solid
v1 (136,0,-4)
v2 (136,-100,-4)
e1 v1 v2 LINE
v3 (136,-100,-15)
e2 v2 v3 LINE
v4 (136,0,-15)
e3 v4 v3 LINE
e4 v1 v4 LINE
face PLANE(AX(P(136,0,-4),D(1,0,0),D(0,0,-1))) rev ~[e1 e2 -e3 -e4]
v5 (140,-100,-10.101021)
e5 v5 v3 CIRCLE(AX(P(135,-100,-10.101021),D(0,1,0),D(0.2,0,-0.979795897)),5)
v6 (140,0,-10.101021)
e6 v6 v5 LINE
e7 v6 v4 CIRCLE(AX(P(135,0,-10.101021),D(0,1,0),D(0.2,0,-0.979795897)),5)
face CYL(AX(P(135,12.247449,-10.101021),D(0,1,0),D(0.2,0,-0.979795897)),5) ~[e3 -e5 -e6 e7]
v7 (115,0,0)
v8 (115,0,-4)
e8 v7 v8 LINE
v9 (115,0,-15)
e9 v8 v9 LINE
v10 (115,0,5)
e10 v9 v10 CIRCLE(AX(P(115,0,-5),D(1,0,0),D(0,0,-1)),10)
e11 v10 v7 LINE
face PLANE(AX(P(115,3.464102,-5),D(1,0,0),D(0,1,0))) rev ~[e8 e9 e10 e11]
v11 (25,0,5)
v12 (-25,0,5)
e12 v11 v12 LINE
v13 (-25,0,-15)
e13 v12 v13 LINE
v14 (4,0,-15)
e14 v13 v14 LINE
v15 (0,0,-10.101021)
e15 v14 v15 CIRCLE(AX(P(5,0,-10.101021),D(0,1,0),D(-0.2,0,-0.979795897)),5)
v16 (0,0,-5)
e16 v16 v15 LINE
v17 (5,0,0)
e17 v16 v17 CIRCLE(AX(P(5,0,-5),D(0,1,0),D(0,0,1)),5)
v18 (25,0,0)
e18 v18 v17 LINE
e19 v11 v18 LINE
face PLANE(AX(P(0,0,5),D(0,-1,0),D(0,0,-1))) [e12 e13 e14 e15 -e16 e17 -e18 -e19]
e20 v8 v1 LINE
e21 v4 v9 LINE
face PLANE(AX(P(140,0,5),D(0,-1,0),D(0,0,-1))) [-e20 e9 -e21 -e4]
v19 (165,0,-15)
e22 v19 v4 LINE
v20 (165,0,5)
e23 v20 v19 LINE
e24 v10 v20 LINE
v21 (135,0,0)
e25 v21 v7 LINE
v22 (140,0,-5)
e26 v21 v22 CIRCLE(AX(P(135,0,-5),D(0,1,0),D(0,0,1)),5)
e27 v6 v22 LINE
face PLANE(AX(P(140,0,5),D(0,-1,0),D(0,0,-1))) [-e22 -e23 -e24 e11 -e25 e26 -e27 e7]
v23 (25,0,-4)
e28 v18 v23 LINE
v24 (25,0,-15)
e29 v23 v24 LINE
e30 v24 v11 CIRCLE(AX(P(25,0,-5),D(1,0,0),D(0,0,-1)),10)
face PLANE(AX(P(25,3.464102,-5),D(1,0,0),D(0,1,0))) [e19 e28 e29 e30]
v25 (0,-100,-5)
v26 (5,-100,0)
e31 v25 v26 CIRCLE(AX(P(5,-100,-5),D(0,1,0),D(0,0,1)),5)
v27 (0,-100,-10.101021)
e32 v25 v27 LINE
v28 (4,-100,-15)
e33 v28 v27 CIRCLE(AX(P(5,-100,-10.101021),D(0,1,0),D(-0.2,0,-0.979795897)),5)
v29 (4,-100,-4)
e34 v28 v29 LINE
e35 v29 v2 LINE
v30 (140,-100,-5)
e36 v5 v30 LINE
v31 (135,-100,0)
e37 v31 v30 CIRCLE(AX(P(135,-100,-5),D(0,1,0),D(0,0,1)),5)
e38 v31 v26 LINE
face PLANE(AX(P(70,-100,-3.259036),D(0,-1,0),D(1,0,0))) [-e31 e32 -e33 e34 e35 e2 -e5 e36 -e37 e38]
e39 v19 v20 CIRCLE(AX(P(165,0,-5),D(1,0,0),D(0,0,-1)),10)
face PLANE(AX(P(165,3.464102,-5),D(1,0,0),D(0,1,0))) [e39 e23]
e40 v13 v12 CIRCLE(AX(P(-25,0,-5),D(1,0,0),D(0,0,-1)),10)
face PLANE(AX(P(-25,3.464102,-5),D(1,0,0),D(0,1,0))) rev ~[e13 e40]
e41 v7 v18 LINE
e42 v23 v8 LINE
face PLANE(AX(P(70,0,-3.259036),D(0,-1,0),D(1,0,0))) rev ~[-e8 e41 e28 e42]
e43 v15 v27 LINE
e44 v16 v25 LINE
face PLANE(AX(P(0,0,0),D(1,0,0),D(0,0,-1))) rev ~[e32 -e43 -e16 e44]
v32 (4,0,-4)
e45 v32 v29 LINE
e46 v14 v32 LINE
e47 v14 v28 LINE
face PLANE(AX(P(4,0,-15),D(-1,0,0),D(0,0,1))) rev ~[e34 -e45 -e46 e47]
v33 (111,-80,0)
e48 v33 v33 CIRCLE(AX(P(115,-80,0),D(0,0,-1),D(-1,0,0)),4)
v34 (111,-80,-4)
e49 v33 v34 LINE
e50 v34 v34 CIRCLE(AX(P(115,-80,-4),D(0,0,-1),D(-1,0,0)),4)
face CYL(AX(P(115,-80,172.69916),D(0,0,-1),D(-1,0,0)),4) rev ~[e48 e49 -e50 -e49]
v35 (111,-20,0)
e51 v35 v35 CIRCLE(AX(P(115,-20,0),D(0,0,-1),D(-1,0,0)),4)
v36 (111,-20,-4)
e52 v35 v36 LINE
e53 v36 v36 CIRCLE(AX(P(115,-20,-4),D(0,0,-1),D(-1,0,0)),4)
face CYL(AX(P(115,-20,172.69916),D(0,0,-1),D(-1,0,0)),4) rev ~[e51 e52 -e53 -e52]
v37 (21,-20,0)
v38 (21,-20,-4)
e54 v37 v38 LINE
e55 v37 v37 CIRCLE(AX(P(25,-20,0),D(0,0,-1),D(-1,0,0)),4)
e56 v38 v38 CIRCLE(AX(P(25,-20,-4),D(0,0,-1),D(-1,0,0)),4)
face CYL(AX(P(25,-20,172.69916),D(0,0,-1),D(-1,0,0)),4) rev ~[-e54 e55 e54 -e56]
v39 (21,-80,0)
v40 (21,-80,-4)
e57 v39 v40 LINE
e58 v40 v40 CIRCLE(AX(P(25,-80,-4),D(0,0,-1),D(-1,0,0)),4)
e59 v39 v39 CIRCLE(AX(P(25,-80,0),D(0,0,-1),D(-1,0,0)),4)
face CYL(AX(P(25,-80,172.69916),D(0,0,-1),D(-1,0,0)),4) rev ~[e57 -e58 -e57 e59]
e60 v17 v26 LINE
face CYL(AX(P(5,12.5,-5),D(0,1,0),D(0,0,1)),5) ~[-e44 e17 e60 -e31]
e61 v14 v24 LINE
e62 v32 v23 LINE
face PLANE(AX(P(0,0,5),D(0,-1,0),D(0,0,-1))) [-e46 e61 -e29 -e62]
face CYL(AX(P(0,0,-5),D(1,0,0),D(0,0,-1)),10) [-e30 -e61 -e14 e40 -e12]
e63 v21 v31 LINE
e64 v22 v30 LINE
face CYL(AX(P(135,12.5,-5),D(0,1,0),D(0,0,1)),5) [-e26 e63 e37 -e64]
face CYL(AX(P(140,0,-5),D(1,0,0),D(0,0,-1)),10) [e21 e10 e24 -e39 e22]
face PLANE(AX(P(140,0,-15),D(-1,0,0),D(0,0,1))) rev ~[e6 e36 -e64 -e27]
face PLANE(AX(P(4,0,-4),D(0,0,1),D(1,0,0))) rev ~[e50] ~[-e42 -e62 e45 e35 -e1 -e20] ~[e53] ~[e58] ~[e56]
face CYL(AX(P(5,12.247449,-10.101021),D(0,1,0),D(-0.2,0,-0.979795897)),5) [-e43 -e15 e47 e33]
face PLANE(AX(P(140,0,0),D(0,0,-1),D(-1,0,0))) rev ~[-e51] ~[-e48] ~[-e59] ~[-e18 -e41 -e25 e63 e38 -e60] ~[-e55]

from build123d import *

# Parameters (mm, degrees)
F1_DEPTH    = 100
F2_T1_DEPTH = 125
F2_T3_DEPTH = 124.4948974279
F3_T1_DEPTH = 124.4948974279
F3_T3_DEPTH = 125
F5_D        = 8
F7_R        = 7.5
F10_DEPTH   = 25
F14_DEPTH   = 25


# Not quite as in the source:
# - a fillet or chamfer that OpenCascade refuses, or shapes differently, is made with other operations: its cross-section is extruded or revolved along the edge and cut away or added


with BuildPart() as f1:
    # F0 (on Front) → F1 (new body)
    with BuildSketch(Plane.XZ):
        Polygon((140, 0), (0, 0), (0, -15), (4, -15), (4, -4), (136, -4), (136, -15), (140, -15), align=None)
    extrude(amount=F1_DEPTH)

    # F2: fillet of radius 5 on 2 edges, made by hand

    # F2_s2 → F2_t1 (cut)
    with BuildSketch(Plane.XZ.offset(-12.5)):
        with BuildLine():
            ThreePointArc((5, 0), (1.4644660941, -1.4644660941), (0, -5))
            Line((0, -5), (0, 0))
            Line((0, 0), (5, 0))
        make_face()
    extrude(amount=F2_T1_DEPTH, mode=Mode.SUBTRACT)

    # F2_s4 → F2_t3 (cut)
    with BuildSketch(Plane.XZ.offset(-12.2474487139)):
        with BuildLine():
            ThreePointArc((136, -15), (138.8729833462, -13.2632981746), (140, -10.1010205144))
            Line((140, -10.1010205144), (140, -15))
            Line((140, -15), (136, -15))
        make_face()
    extrude(amount=F2_T3_DEPTH, mode=Mode.SUBTRACT)

    # F3: fillet of radius 5 on 2 edges, made by hand

    # F3_s2 → F3_t1 (cut)
    with BuildSketch(Plane.XZ.offset(-12.2474487139)):
        with BuildLine():
            ThreePointArc((4, -15), (1.1270166538, -13.2632981746), (0, -10.1010205144))
            Line((0, -10.1010205144), (0, -15))
            Line((0, -15), (4, -15))
        make_face()
    extrude(amount=F3_T1_DEPTH, mode=Mode.SUBTRACT)

    # F3_s4 → F3_t3 (cut)
    with BuildSketch(Plane.XZ.offset(-12.5)):
        with BuildLine():
            ThreePointArc((135, 0), (138.5355339059, -1.4644660941), (140, -5))
            Line((140, -5), (140, 0))
            Line((140, 0), (135, 0))
        make_face()
    extrude(amount=F3_T3_DEPTH, mode=Mode.SUBTRACT)

    # F5 (through all)
    with Locations(Plane.XY):
        with Locations((25, -20), (115, -20), (25, -80), (115, -80)):
            Hole(F5_D / 2)

    # F9 (on Right) → F10 (join, symmetric)
    with BuildSketch(Plane.YZ):
        with BuildLine():
            Line((0, 5), (0, 0))
            Line((0, 0), (0, -5))
            Line((0, -5), (0, -15))
            ThreePointArc((0, -15), (10, -5), (0, 5))
        make_face()
    extrude(amount=F10_DEPTH, both=True)

    # F13 (on offset) → F14 (join, symmetric)
    with BuildSketch(Plane.YZ.offset(140)):
        with BuildLine():
            Line((0, -10.1010205144), (0, -15))
            ThreePointArc((0, -15), (10, -5), (0, 5))
            Line((0, 5), (0, 0))
            Line((0, 0), (0, -5))
            Line((0, -5), (0, -10.1010205144))
        make_face()
    extrude(amount=F14_DEPTH, both=True)


with BuildPart() as f8:
    # F8: sweep along a path in F6
    with BuildLine(Plane.XZ) as f8_path:
        Line((-40, 0), (-40, 100))
        ThreePointArc((-40, 100), (-85, 150), (-130, 100))
        Line((-130, 100), (-130, 0))
    # F7 (on Top) → F8 (sweep)
    with BuildSketch(Plane.XY):
        with Locations((-40, 0)):
            Circle(F7_R)
    sweep(path=f8_path.line)


solid = f1.part
